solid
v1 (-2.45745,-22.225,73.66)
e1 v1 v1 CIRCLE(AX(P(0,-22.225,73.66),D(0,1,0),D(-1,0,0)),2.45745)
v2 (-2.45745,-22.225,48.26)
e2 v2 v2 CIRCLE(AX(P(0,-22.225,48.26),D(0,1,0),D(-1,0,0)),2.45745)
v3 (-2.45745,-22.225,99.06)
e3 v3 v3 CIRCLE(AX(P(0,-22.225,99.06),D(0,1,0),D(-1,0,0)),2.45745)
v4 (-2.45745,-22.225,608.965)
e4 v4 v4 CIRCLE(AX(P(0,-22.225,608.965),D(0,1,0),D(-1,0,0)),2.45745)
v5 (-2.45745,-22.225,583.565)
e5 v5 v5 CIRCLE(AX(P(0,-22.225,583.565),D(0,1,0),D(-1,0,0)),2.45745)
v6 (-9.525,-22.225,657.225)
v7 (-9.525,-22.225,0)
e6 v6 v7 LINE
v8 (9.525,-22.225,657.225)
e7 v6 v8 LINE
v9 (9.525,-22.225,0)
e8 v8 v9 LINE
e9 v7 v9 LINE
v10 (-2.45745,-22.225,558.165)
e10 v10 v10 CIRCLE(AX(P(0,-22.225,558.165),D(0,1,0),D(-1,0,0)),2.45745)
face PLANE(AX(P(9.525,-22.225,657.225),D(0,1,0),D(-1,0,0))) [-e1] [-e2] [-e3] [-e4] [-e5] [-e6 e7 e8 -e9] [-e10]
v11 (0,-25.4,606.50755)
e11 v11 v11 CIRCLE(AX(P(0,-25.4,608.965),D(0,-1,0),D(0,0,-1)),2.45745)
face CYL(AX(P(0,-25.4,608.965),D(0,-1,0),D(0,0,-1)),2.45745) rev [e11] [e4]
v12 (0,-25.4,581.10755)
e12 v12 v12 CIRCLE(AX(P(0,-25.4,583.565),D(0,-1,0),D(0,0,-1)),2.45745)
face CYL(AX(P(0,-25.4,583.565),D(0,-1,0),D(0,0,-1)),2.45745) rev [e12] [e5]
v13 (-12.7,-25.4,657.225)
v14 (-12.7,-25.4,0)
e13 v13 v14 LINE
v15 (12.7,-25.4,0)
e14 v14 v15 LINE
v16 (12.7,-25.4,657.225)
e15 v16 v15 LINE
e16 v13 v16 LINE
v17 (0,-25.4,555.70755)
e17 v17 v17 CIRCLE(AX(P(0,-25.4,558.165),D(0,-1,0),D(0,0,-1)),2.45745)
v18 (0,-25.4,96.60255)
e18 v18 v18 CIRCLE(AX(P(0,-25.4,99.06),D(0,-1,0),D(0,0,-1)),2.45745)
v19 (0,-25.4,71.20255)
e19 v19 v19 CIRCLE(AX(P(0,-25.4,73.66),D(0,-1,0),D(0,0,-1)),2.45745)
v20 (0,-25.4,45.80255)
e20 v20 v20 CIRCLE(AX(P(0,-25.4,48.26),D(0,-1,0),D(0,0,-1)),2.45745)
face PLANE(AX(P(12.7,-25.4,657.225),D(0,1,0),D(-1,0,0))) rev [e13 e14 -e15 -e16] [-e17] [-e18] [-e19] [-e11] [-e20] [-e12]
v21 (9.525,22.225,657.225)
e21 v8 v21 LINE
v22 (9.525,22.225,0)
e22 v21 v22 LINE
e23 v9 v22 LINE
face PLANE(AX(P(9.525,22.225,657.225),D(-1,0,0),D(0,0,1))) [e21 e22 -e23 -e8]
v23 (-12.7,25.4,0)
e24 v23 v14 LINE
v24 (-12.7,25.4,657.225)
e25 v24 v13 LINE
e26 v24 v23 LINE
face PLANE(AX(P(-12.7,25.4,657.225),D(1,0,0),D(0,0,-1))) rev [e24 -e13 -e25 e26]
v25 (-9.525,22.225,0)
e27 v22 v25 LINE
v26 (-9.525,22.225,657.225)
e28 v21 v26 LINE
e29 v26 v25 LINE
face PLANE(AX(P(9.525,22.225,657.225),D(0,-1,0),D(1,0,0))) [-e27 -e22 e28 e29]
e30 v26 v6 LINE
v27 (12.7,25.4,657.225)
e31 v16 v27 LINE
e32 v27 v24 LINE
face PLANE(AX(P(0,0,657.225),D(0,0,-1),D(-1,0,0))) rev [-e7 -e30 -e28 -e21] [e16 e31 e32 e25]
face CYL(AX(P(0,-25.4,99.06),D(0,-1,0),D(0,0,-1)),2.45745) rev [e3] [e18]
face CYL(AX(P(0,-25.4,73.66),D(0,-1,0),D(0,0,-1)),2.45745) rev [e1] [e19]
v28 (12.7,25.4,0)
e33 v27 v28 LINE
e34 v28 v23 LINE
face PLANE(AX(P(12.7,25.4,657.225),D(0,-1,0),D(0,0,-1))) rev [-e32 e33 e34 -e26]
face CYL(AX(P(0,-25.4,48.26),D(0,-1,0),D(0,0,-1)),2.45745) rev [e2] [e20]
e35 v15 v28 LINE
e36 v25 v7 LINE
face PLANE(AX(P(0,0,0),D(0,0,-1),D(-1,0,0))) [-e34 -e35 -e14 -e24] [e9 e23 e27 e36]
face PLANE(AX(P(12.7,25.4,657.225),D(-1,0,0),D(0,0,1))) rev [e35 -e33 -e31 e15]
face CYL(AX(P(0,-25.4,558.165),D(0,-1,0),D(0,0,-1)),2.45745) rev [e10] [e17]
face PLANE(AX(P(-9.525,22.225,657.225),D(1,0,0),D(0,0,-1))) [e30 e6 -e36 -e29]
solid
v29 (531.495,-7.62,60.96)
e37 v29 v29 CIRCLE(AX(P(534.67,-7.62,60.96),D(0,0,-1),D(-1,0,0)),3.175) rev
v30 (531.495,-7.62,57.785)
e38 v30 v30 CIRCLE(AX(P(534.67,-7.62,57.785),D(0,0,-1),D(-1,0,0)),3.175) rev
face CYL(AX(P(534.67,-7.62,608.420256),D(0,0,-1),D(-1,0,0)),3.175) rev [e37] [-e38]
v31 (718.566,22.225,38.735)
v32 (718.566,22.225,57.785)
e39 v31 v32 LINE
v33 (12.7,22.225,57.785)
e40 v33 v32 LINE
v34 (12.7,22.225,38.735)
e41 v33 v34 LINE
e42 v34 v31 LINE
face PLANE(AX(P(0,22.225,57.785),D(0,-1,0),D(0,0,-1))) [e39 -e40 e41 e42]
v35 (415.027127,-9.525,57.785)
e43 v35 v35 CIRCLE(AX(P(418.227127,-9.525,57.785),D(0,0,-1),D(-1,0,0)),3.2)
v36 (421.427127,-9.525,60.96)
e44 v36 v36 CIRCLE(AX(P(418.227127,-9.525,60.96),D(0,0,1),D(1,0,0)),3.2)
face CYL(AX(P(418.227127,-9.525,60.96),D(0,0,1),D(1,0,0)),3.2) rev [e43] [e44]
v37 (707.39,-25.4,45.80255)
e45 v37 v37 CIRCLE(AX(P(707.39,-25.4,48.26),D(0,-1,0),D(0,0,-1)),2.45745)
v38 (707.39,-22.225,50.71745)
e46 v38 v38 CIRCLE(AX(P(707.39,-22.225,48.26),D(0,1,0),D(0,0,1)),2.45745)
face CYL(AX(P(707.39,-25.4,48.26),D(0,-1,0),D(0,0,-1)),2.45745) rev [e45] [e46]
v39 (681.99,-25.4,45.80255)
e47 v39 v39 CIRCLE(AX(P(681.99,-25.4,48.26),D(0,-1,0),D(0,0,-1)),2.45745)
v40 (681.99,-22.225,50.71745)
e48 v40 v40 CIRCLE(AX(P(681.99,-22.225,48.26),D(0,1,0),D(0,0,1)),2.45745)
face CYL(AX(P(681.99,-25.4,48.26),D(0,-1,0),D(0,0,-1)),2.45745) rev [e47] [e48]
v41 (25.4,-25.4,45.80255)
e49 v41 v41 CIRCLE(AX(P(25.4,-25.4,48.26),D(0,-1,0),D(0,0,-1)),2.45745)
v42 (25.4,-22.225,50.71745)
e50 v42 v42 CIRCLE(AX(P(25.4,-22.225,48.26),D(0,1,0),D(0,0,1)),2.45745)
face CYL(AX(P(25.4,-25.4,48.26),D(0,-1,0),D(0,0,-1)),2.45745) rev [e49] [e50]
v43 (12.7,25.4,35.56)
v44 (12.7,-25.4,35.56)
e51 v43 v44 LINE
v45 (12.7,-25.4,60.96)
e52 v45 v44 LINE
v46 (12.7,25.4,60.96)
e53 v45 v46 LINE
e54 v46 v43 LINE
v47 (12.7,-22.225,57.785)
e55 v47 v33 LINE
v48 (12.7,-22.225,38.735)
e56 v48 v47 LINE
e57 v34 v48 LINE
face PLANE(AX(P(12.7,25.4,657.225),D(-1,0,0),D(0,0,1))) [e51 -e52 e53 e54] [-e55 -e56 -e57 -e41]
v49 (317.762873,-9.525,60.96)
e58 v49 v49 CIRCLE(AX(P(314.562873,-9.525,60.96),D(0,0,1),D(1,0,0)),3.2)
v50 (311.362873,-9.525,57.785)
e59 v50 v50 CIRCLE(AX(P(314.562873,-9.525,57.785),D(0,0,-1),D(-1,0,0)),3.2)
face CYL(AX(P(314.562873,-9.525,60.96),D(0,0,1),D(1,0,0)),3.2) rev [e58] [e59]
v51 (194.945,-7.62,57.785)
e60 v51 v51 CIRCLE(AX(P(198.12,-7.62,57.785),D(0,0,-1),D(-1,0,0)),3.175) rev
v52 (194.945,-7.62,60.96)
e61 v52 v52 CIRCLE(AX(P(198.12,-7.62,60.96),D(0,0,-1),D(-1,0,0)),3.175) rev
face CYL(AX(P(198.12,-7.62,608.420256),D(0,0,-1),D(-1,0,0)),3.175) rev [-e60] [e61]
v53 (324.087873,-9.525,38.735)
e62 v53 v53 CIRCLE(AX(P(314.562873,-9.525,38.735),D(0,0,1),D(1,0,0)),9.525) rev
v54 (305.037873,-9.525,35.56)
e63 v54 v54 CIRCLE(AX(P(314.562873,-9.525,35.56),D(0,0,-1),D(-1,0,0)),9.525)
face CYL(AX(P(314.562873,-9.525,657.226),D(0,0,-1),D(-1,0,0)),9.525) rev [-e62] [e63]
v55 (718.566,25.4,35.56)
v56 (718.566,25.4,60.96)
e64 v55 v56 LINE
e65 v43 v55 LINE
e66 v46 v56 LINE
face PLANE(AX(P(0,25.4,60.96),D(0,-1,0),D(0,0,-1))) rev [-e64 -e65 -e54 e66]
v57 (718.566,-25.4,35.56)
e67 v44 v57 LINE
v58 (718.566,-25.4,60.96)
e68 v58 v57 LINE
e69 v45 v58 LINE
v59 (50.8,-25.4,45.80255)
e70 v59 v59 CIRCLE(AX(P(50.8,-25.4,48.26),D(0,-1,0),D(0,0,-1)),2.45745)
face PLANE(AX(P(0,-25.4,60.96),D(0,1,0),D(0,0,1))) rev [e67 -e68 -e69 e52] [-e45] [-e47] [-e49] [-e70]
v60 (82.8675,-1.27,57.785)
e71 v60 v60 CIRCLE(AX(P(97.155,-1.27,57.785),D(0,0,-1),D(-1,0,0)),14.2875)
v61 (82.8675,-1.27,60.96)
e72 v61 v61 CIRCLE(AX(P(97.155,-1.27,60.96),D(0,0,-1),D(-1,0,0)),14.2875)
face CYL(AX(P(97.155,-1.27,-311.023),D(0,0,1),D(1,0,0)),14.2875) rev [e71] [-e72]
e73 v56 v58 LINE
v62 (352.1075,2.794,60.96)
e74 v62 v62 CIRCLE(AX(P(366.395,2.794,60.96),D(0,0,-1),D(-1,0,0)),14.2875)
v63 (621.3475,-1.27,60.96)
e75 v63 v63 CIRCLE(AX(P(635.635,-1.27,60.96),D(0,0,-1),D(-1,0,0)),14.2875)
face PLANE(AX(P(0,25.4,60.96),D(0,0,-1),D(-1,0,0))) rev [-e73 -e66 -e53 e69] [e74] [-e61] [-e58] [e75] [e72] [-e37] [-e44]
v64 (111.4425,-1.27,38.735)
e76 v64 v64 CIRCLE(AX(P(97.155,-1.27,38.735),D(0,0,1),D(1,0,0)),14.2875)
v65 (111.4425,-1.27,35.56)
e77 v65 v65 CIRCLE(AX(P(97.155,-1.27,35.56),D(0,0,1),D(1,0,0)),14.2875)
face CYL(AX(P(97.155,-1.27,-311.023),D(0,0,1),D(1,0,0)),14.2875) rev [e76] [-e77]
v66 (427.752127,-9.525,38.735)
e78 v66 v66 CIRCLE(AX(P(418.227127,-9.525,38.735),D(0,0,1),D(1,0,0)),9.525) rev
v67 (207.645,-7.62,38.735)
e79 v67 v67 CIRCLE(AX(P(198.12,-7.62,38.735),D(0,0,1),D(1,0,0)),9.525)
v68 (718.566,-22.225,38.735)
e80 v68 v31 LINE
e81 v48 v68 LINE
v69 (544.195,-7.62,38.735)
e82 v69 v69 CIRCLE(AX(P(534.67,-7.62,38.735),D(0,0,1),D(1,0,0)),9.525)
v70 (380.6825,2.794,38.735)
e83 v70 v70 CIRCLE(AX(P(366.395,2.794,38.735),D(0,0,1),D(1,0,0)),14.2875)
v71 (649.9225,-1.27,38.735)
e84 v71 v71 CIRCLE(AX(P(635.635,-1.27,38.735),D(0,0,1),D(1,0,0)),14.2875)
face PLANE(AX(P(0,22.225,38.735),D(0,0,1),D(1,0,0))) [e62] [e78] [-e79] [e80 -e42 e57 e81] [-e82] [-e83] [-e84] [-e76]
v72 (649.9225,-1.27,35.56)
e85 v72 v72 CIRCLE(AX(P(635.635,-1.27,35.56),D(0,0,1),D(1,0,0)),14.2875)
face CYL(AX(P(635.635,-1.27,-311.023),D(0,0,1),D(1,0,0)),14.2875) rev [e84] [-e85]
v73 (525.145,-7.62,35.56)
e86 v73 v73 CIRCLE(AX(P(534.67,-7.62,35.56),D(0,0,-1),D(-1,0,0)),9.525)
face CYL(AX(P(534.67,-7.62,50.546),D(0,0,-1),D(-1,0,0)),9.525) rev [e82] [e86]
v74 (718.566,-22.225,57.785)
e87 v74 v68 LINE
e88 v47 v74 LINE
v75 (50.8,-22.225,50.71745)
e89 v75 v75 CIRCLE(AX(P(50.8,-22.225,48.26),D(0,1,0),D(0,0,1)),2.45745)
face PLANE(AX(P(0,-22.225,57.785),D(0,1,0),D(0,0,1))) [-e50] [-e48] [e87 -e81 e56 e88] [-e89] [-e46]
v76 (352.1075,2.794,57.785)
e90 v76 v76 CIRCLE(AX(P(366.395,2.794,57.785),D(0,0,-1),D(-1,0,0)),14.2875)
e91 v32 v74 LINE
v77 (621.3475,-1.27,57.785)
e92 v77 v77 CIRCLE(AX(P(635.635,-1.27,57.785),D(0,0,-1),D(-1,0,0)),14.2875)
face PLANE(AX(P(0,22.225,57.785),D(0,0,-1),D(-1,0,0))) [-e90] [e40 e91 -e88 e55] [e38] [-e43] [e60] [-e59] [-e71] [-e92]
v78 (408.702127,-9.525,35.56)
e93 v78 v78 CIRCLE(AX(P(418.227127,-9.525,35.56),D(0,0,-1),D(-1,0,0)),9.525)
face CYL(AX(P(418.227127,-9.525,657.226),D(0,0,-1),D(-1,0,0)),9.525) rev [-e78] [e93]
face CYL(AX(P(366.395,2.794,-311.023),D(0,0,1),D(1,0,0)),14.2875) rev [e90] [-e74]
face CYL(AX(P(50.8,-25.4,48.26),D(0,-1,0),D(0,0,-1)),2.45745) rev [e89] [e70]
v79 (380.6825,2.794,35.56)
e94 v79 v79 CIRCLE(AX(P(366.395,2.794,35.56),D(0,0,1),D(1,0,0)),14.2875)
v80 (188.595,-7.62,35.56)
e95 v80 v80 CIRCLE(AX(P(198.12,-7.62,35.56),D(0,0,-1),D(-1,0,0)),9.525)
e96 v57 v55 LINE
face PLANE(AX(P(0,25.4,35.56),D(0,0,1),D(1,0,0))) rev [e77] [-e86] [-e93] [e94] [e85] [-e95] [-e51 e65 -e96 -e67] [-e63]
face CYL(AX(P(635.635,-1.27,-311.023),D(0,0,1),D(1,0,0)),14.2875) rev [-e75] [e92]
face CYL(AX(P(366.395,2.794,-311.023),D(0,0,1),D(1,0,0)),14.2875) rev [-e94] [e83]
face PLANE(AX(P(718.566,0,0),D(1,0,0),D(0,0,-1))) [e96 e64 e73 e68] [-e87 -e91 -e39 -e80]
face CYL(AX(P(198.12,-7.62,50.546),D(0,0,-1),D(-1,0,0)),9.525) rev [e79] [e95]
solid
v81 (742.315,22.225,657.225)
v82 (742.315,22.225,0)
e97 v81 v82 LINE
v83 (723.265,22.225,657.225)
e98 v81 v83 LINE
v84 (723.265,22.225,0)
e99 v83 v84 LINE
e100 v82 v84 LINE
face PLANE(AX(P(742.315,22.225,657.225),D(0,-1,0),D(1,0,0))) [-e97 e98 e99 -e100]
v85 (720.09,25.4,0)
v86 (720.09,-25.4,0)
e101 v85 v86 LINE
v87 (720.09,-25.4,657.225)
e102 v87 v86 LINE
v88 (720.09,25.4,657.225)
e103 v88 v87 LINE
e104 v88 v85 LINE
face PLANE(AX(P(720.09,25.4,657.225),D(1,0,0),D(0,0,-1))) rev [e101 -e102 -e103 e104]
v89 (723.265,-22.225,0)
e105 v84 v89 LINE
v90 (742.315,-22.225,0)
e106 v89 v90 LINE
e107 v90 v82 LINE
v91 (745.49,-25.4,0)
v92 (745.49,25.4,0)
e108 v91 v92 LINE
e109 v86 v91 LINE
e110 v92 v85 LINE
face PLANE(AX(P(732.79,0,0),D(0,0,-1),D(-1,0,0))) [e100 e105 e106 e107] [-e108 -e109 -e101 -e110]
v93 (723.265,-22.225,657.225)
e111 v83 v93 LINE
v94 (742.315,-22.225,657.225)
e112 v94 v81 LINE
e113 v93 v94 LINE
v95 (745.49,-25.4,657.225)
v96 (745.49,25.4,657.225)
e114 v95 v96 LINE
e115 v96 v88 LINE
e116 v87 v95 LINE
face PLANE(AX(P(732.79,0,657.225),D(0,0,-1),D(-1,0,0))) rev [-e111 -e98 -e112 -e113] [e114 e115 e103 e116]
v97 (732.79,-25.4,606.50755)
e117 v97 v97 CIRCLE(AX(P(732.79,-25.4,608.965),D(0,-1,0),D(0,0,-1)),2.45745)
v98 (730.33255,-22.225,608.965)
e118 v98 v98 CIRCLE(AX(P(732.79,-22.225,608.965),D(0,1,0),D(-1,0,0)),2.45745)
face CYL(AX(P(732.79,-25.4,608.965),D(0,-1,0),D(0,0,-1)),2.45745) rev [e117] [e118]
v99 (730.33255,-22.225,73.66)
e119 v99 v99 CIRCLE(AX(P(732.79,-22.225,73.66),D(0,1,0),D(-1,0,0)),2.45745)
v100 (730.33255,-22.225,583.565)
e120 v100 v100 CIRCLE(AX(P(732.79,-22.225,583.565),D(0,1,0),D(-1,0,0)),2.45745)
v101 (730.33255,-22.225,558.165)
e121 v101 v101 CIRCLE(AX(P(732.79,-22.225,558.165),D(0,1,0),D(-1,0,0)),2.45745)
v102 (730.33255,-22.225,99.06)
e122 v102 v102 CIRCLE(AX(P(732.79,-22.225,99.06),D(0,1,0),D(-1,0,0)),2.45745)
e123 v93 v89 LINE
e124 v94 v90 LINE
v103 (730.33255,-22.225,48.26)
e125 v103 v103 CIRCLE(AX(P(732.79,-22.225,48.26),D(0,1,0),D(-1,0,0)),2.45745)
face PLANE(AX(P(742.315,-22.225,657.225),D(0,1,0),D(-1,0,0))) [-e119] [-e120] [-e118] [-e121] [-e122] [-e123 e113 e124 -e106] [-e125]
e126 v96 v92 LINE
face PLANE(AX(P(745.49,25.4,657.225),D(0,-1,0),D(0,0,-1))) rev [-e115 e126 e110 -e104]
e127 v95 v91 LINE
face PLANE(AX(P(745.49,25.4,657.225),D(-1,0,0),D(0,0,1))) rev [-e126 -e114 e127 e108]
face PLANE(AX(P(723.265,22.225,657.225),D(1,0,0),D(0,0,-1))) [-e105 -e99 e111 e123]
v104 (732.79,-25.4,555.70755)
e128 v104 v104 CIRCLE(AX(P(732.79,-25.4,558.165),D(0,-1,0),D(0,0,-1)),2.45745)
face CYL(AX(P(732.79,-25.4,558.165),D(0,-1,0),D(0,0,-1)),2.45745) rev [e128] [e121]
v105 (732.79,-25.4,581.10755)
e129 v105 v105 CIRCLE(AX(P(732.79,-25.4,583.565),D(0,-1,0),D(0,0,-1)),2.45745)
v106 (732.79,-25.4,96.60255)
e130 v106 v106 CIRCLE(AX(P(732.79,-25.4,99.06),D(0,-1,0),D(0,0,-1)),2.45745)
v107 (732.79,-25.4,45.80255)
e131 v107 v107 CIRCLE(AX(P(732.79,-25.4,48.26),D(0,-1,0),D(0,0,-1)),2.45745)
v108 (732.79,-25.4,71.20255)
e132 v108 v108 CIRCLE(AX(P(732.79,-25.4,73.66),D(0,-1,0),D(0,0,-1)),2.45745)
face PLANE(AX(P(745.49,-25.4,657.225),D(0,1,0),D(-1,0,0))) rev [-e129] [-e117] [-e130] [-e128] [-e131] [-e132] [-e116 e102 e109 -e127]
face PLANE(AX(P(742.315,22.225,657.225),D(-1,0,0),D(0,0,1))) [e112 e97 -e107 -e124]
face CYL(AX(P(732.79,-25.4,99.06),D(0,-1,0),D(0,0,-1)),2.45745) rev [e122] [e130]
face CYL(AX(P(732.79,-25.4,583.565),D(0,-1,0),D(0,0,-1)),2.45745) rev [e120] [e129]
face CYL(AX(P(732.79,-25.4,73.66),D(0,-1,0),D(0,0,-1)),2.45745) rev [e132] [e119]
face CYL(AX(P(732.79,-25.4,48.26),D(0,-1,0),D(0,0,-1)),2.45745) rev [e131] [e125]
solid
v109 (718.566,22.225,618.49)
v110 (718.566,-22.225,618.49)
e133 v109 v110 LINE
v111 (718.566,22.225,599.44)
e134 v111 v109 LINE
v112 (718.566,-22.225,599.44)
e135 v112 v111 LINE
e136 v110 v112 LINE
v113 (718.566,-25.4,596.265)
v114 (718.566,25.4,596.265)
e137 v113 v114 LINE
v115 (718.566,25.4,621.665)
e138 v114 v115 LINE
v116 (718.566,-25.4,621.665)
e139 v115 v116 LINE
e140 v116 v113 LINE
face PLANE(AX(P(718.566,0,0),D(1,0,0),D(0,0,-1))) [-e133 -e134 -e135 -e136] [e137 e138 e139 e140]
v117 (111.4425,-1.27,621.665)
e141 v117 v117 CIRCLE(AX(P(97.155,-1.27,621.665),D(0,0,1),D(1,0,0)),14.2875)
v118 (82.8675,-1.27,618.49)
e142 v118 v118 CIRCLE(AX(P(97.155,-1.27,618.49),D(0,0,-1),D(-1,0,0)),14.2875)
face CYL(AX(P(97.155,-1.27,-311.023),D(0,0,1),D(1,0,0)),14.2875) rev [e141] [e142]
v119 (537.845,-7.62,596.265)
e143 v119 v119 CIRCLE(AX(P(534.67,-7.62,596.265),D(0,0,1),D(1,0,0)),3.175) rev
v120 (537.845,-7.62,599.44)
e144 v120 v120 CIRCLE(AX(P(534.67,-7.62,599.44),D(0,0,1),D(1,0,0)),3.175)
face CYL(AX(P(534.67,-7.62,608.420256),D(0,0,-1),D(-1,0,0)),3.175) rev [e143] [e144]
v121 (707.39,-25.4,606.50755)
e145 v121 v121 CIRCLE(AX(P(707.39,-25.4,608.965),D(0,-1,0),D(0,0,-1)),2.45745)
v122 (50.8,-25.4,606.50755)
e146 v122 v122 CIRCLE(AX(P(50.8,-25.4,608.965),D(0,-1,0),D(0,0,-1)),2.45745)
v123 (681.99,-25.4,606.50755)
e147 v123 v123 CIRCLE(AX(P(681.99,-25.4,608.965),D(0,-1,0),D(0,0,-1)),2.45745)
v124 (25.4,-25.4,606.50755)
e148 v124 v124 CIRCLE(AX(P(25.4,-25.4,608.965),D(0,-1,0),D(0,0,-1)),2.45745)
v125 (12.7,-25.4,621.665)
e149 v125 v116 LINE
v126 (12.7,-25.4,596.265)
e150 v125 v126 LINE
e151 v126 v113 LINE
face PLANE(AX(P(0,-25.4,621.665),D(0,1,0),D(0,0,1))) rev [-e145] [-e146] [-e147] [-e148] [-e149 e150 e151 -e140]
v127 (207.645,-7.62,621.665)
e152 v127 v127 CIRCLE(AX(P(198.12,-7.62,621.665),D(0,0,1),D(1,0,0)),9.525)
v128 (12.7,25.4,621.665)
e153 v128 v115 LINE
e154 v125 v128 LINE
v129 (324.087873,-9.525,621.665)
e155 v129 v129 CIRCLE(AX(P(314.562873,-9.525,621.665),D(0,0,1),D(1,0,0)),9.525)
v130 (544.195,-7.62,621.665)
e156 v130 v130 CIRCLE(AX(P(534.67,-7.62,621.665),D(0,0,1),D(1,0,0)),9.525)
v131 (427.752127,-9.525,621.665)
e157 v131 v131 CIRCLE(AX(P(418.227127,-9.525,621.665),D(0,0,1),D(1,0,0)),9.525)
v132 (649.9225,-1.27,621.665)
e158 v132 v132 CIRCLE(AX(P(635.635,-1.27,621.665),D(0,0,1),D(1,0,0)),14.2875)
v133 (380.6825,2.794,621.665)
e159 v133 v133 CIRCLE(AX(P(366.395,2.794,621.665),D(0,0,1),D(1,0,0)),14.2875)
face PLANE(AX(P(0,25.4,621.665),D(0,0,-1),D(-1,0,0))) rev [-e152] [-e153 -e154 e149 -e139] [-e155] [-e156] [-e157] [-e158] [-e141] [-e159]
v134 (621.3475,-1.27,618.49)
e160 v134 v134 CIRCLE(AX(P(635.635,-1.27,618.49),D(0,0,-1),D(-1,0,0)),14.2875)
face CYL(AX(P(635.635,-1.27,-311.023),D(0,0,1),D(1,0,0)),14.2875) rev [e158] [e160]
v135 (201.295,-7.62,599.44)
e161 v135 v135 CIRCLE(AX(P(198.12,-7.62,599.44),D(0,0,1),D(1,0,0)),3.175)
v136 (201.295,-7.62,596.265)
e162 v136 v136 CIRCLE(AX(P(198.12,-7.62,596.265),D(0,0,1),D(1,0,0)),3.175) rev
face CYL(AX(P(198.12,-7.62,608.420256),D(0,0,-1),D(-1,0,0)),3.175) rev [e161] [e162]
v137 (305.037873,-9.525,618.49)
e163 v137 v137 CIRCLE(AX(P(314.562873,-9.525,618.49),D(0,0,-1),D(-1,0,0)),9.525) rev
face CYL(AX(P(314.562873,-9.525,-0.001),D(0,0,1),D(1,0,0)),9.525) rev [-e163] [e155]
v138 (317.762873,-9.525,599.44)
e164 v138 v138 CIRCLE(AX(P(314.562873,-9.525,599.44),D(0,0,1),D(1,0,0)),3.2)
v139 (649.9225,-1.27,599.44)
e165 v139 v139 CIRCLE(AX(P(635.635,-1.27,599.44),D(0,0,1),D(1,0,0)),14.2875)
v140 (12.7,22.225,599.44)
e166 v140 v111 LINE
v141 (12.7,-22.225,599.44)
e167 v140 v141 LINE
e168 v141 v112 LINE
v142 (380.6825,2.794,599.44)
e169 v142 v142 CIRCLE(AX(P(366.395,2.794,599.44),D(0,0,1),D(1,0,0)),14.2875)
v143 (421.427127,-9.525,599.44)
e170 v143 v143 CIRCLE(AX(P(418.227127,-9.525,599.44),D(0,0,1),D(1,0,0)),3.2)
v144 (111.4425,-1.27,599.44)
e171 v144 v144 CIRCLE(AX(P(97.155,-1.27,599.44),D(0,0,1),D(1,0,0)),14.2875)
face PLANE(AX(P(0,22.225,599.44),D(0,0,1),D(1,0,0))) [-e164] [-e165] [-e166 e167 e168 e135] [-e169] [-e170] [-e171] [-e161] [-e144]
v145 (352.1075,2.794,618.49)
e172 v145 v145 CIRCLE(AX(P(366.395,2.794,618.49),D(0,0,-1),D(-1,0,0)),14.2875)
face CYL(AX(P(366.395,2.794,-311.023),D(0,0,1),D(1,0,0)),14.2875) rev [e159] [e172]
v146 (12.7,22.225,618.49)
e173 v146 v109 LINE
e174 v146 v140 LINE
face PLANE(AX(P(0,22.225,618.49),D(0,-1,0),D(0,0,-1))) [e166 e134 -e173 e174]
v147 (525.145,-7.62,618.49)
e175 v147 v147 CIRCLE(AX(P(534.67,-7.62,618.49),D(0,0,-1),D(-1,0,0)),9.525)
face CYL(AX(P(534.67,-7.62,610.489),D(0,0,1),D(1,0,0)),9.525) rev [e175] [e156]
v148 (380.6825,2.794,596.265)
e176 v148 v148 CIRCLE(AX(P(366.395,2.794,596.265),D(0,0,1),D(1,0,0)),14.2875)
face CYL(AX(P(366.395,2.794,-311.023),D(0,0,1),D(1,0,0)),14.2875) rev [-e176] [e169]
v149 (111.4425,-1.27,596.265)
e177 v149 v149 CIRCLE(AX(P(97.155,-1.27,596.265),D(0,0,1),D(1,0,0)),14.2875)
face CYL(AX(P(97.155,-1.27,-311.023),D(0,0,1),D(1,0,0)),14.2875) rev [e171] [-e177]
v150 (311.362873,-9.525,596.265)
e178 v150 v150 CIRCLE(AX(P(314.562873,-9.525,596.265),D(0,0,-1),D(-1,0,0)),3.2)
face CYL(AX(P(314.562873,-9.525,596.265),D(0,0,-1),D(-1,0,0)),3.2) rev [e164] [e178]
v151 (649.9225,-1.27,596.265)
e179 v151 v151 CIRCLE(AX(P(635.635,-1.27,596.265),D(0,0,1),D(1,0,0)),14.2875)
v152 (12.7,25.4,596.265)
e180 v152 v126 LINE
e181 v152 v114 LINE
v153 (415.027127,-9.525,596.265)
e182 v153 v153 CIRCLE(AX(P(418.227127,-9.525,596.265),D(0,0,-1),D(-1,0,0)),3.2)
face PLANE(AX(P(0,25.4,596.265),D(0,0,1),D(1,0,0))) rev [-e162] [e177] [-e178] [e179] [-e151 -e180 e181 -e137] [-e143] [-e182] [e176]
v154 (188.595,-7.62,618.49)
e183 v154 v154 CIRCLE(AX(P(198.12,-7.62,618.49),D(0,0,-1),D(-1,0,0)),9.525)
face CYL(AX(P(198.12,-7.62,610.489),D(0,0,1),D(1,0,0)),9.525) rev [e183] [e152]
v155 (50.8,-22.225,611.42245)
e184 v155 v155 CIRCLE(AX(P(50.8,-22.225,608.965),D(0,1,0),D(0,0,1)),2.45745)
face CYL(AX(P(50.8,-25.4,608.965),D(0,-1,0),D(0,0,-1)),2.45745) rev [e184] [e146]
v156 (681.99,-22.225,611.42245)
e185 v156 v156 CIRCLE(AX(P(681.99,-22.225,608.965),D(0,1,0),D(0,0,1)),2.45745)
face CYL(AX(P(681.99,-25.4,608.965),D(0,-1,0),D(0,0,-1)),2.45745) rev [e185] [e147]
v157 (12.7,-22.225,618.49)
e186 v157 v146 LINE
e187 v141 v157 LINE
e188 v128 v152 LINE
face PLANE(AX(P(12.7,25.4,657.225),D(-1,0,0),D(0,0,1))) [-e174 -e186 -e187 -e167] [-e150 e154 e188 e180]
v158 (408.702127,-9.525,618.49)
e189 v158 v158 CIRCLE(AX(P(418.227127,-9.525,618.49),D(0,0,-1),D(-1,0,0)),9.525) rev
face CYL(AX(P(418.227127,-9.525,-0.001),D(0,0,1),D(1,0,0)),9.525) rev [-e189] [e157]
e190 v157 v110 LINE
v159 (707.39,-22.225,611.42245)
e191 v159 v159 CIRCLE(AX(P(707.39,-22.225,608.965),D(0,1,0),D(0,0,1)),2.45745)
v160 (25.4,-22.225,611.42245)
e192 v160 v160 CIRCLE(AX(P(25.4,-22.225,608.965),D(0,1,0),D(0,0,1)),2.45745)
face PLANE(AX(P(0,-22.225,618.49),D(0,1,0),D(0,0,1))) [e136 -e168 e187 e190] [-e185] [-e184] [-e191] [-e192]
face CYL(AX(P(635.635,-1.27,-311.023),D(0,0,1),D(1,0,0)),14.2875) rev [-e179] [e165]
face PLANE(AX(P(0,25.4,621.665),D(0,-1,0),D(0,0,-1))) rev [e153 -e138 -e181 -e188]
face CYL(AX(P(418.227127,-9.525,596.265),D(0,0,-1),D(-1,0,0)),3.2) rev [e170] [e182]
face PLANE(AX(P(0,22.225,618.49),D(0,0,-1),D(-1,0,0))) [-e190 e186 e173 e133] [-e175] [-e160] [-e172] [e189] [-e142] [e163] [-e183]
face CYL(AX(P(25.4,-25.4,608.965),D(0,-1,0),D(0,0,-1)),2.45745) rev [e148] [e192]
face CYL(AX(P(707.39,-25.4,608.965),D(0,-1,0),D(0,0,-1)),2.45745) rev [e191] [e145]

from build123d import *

# Parameters (mm, degrees)
STRUCTURAL_START                       = -25.4
STRUCTURAL_MEMBER1_OUTLINE_W           = 707.39
STRUCTURAL_MEMBER1_OUTLINE_H           = 3.175
STRUCTURAL_MEMBER1_DEPTH               = 50.8
STRUCTURAL_MEMBER1_2_OUTLINE_W         = 707.39
STRUCTURAL_MEMBER1_2_OUTLINE_H         = 19.05
STRUCTURAL_MEMBER1_2_DEPTH             = 3.175
STRUCTURAL_START_2                     = 22.225
STRUCTURAL_MEMBER1_3_OUTLINE_W         = 707.39
STRUCTURAL_MEMBER1_3_OUTLINE_H         = 19.05
STRUCTURAL_MEMBER1_3_DEPTH             = 3.175
STRUCTURAL_MEMBER1_4_OUTLINE_W         = 707.39
STRUCTURAL_MEMBER1_4_OUTLINE_H         = 3.175
STRUCTURAL_MEMBER1_4_DEPTH             = 50.8
STRUCTURAL_MEMBER1_5_OUTLINE_W         = 707.39
STRUCTURAL_MEMBER1_5_OUTLINE_H         = 19.05
STRUCTURAL_MEMBER1_5_DEPTH             = 3.175
STRUCTURAL_MEMBER1_6_OUTLINE_W         = 707.39
STRUCTURAL_MEMBER1_6_OUTLINE_H         = 19.05
STRUCTURAL_MEMBER1_6_DEPTH             = 3.175
STRUCTURAL_START_3                     = -12.7
STRUCTURAL_MEMBER1_7_OUTLINE_W         = 50.8
STRUCTURAL_MEMBER1_7_OUTLINE_H         = 657.225
STRUCTURAL_MEMBER1_7_DEPTH             = 3.175
STRUCTURAL_START_4                     = 9.525
STRUCTURAL_MEMBER1_8_OUTLINE_W         = 50.8
STRUCTURAL_MEMBER1_8_OUTLINE_H         = 657.225
STRUCTURAL_MEMBER1_8_DEPTH             = 3.175
STRUCTURAL_START_5                     = -9.525
STRUCTURAL_MEMBER1_9_OUTLINE_W         = 3.175
STRUCTURAL_MEMBER1_9_OUTLINE_H         = 657.225
STRUCTURAL_MEMBER1_9_DEPTH             = 19.05
STRUCTURAL_START_6                     = 720.09
STRUCTURAL_MEMBER1_10_OUTLINE_W        = 50.8
STRUCTURAL_MEMBER1_10_OUTLINE_H        = 657.225
STRUCTURAL_MEMBER1_10_DEPTH            = 3.175
STRUCTURAL_START_7                     = 742.315
STRUCTURAL_MEMBER1_11_OUTLINE_W        = 50.8
STRUCTURAL_MEMBER1_11_OUTLINE_H        = 657.225
STRUCTURAL_MEMBER1_11_DEPTH            = 3.175
STRUCTURAL_START_8                     = 723.265
STRUCTURAL_MEMBER1_12_OUTLINE_W        = 3.175
STRUCTURAL_MEMBER1_12_OUTLINE_H        = 657.225
STRUCTURAL_MEMBER1_12_DEPTH            = 19.05
SKETCH5_R                              = 14.2875
CUT_EXTRUDE1_DEPTH                     = 932.688
CUT_EXTRUDE8_START                     = -3.175
SKETCH8_R                              = 3.175
CUT_EXTRUDE8_DEPTH                     = 541.655
SKETCH10_R                             = 9.525
CUT_EXTRUDE9_DEPTH                     = 11.176
SKETCH11_R                             = 9.525
CUT_EXTRUDE10_DEPTH                    = 14.986
SKETCH13_W                             = 3.2
SKETCH13_H                             = 3.176
M6_CLEARANCE_HOLE1_AT_2_COUNT          = 2
M6_CLEARANCE_HOLE1_AT_2_PITCH          = 103.664253865
SKETCH17_W                             = 3.2
SKETCH17_H                             = 3.176
M6_CLEARANCE_HOLE3_AT_2_COUNT          = 2
M6_CLEARANCE_HOLE3_AT_2_PITCH          = 103.664253865
SKETCH20_R                             = 9.525
CUT_EXTRUDE11_DEPTH                    = 3.175
SKETCH21_R                             = 9.525
CUT_EXTRUDE12_DEPTH                    = 3.175
SKETCH22_R                             = 9.525
CUT_EXTRUDE13_DEPTH                    = 3.175
SKETCH23_R                             = 9.525
CUT_EXTRUDE14_DEPTH                    = 3.175
F_10_START                             = -25.4
F_10_0_1935_DIAMETER_HOLE1_OUTLINE_R   = 2.45745
F_10_0_1935_DIAMETER_HOLE1_DEPTH       = 3.175
SKETCH26_W                             = 2.45745
SKETCH26_H                             = 3.176
F_10_0_1935_DIAMETER_HOLE2_AT_2_COUNT  = 2
F_10_0_1935_DIAMETER_HOLE2_AT_2_PITCH  = 25.4
F_10_0_1935_DIAMETER_HOLE2_AT_3_COUNT  = 2
F_10_0_1935_DIAMETER_HOLE2_AT_3_PITCH  = 50.8
F_10_0_1935_DIAMETER_HOLE2_AT_4_COUNT  = 2
F_10_0_1935_DIAMETER_HOLE2_AT_4_PITCH  = 56.796126628
F_10_0_1935_DIAMETER_HOLE2_AT_5_COUNT  = 2
F_10_0_1935_DIAMETER_HOLE2_AT_5_PITCH  = 71.842048969
F_10_0_1935_DIAMETER_HOLE2_AT_6_COUNT  = 2
F_10_0_1935_DIAMETER_HOLE2_AT_6_PITCH  = 683.879375402
F_10_0_1935_DIAMETER_HOLE2_AT_7_COUNT  = 2
F_10_0_1935_DIAMETER_HOLE2_AT_7_PITCH  = 709.211711762
F_10_0_1935_DIAMETER_HOLE2_AT_8_COUNT  = 2
F_10_0_1935_DIAMETER_HOLE2_AT_8_PITCH  = 733.230075829
F_10_0_1935_DIAMETER_HOLE2_AT_9_COUNT  = 2
F_10_0_1935_DIAMETER_HOLE2_AT_9_PITCH  = 734.548721393
F_10_0_1935_DIAMETER_HOLE2_AT_10_COUNT = 2
F_10_0_1935_DIAMETER_HOLE2_AT_10_PITCH = 732.79
F_10_0_1935_DIAMETER_HOLE2_AT_11_COUNT = 2
F_10_0_1935_DIAMETER_HOLE2_AT_11_PITCH = 851.535947054
F_10_0_1935_DIAMETER_HOLE2_AT_12_COUNT = 2
F_10_0_1935_DIAMETER_HOLE2_AT_12_PITCH = 872.011307911
F_10_0_1935_DIAMETER_HOLE2_AT_13_COUNT = 2
F_10_0_1935_DIAMETER_HOLE2_AT_13_PITCH = 892.739767864
F_10_0_1935_DIAMETER_HOLE2_AT_14_COUNT = 2
F_10_0_1935_DIAMETER_HOLE2_AT_14_PITCH = 878.479526867
F_10_0_1935_DIAMETER_HOLE2_AT_15_COUNT = 2
F_10_0_1935_DIAMETER_HOLE2_AT_15_PITCH = 864.730353998
SKETCH28_W                             = 25.4
SKETCH28_H                             = 50.8
CUT_EXTRUDE15_DEPTH                    = 1.524


# Read off the part's stored shape, not the designer's step: Structural Member1, #10 (0.1935) Diameter Hole1
with BuildPart() as part:
    # Structural Member1 outline → Structural Member1 (new body)
    with BuildSketch(Plane(origin=(0, 0, 0), x_dir=(1, 0, 0), z_dir=(0, 1, 0)).offset(STRUCTURAL_START)):
        with Locations((366.395, -59.3725)):
            Rectangle(STRUCTURAL_MEMBER1_OUTLINE_W, STRUCTURAL_MEMBER1_OUTLINE_H)
        with Locations((366.395, -37.1475)):
            Rectangle(STRUCTURAL_MEMBER1_OUTLINE_W, STRUCTURAL_MEMBER1_OUTLINE_H)
    extrude(amount=STRUCTURAL_MEMBER1_DEPTH)

    # Structural Member1 2 outline → Structural Member1 2 (add)
    with BuildSketch(Plane(origin=(0, 0, 0), x_dir=(1, 0, 0), z_dir=(0, 1, 0)).offset(STRUCTURAL_START)):
        with Locations((366.395, -48.26)):
            Rectangle(STRUCTURAL_MEMBER1_2_OUTLINE_W, STRUCTURAL_MEMBER1_2_OUTLINE_H)
    extrude(amount=STRUCTURAL_MEMBER1_2_DEPTH)

    # Structural Member1 3 outline → Structural Member1 3 (add)
    with BuildSketch(Plane(origin=(0, 0, 0), x_dir=(1, 0, 0), z_dir=(0, 1, 0)).offset(STRUCTURAL_START_2)):
        with Locations((366.395, -48.26)):
            Rectangle(STRUCTURAL_MEMBER1_3_OUTLINE_W, STRUCTURAL_MEMBER1_3_OUTLINE_H)
    extrude(amount=STRUCTURAL_MEMBER1_3_DEPTH)


with BuildPart() as body_2:
    # Structural Member1 4 outline → Structural Member1 4 (new body)
    with BuildSketch(Plane(origin=(0, 0, 0), x_dir=(1, 0, 0), z_dir=(0, 1, 0)).offset(STRUCTURAL_START)):
        with Locations((366.395, -620.0775)):
            Rectangle(STRUCTURAL_MEMBER1_4_OUTLINE_W, STRUCTURAL_MEMBER1_4_OUTLINE_H)
        with Locations((366.395, -597.8525)):
            Rectangle(STRUCTURAL_MEMBER1_4_OUTLINE_W, STRUCTURAL_MEMBER1_4_OUTLINE_H)
    extrude(amount=STRUCTURAL_MEMBER1_4_DEPTH)

    # Structural Member1 5 outline → Structural Member1 5 (add)
    with BuildSketch(Plane(origin=(0, 0, 0), x_dir=(1, 0, 0), z_dir=(0, 1, 0)).offset(STRUCTURAL_START)):
        with Locations((366.395, -608.965)):
            Rectangle(STRUCTURAL_MEMBER1_5_OUTLINE_W, STRUCTURAL_MEMBER1_5_OUTLINE_H)
    extrude(amount=STRUCTURAL_MEMBER1_5_DEPTH)

    # Structural Member1 6 outline → Structural Member1 6 (add)
    with BuildSketch(Plane(origin=(0, 0, 0), x_dir=(1, 0, 0), z_dir=(0, 1, 0)).offset(STRUCTURAL_START_2)):
        with Locations((366.395, -608.965)):
            Rectangle(STRUCTURAL_MEMBER1_6_OUTLINE_W, STRUCTURAL_MEMBER1_6_OUTLINE_H)
    extrude(amount=STRUCTURAL_MEMBER1_6_DEPTH)


with BuildPart() as body_3:
    # Structural Member1 7 outline → Structural Member1 7 (new body)
    with BuildSketch(Plane.YZ.offset(STRUCTURAL_START_3)):
        with Locations((0, 328.6125)):
            Rectangle(STRUCTURAL_MEMBER1_7_OUTLINE_W, STRUCTURAL_MEMBER1_7_OUTLINE_H)
    extrude(amount=STRUCTURAL_MEMBER1_7_DEPTH)

    # Structural Member1 8 outline → Structural Member1 8 (add)
    with BuildSketch(Plane.YZ.offset(STRUCTURAL_START_4)):
        with Locations((0, 328.6125)):
            Rectangle(STRUCTURAL_MEMBER1_8_OUTLINE_W, STRUCTURAL_MEMBER1_8_OUTLINE_H)
    extrude(amount=STRUCTURAL_MEMBER1_8_DEPTH)

    # Structural Member1 9 outline → Structural Member1 9 (add)
    with BuildSketch(Plane.YZ.offset(STRUCTURAL_START_5)):
        with Locations((-23.8125, 328.6125)):
            Rectangle(STRUCTURAL_MEMBER1_9_OUTLINE_W, STRUCTURAL_MEMBER1_9_OUTLINE_H)
        with Locations((23.8125, 328.6125)):
            Rectangle(STRUCTURAL_MEMBER1_9_OUTLINE_W, STRUCTURAL_MEMBER1_9_OUTLINE_H)
    extrude(amount=STRUCTURAL_MEMBER1_9_DEPTH)


with BuildPart() as body_4:
    # Structural Member1 10 outline → Structural Member1 10 (new body)
    with BuildSketch(Plane.YZ.offset(STRUCTURAL_START_6)):
        with Locations((0, 328.6125)):
            Rectangle(STRUCTURAL_MEMBER1_10_OUTLINE_W, STRUCTURAL_MEMBER1_10_OUTLINE_H)
    extrude(amount=STRUCTURAL_MEMBER1_10_DEPTH)

    # Structural Member1 11 outline → Structural Member1 11 (add)
    with BuildSketch(Plane.YZ.offset(STRUCTURAL_START_7)):
        with Locations((0, 328.6125)):
            Rectangle(STRUCTURAL_MEMBER1_11_OUTLINE_W, STRUCTURAL_MEMBER1_11_OUTLINE_H)
    extrude(amount=STRUCTURAL_MEMBER1_11_DEPTH)

    # Structural Member1 12 outline → Structural Member1 12 (add)
    with BuildSketch(Plane.YZ.offset(STRUCTURAL_START_8)):
        with Locations((-23.8125, 328.6125)):
            Rectangle(STRUCTURAL_MEMBER1_12_OUTLINE_W, STRUCTURAL_MEMBER1_12_OUTLINE_H)
        with Locations((23.8125, 328.6125)):
            Rectangle(STRUCTURAL_MEMBER1_12_OUTLINE_W, STRUCTURAL_MEMBER1_12_OUTLINE_H)
    extrude(amount=STRUCTURAL_MEMBER1_12_DEPTH)


with BuildPart() as cut_extrude1_tool:
    # Sketch5 → Cut-Extrude1 (new body)
    with BuildSketch(Plane.XY.offset(621.665)):
        with Locations(Location((366.395, 2.794, 0), (0, 0, 180))):
            Circle(SKETCH5_R)
        with Locations(Location((97.155, -1.27, 0), (0, 0, 180))):
            Circle(SKETCH5_R)
        with Locations(Location((635.635, -1.27, 0), (0, 0, 180))):
            Circle(SKETCH5_R)
    extrude(amount=-CUT_EXTRUDE1_DEPTH)


with BuildPart() as part_1:
    add(part.part)

    # Cut-Extrude1: cut by cut_extrude1_tool
    add(cut_extrude1_tool.part, mode=Mode.SUBTRACT)


with BuildPart() as body_2_1:
    add(body_2.part)

    # Cut-Extrude1: cut by cut_extrude1_tool
    add(cut_extrude1_tool.part, mode=Mode.SUBTRACT)


with BuildPart() as cut_extrude8_tool:
    # Sketch8 → Cut-Extrude8 (new body)
    with BuildSketch(Plane.XY.offset(60.96).offset(CUT_EXTRUDE8_START)):
        with Locations(Location((534.67, -7.62, 0), (0, 0, 180))):
            Circle(SKETCH8_R)
        with Locations(Location((198.12, -7.62, 0), (0, 0, 180))):
            Circle(SKETCH8_R)
    extrude(amount=CUT_EXTRUDE8_DEPTH)


with BuildPart() as part_2:
    add(part_1.part)

    # Cut-Extrude8: cut by cut_extrude8_tool
    add(cut_extrude8_tool.part, mode=Mode.SUBTRACT)

    # Sketch11 → Cut-Extrude10 (cut)
    with BuildSketch(Plane(origin=(0, 0, 35.56), x_dir=(-1, 0, 0), z_dir=(0, 0, -1))):
        with Locations((-198.12, -7.62)):
            Circle(SKETCH11_R)
        with Locations((-534.67, -7.62)):
            Circle(SKETCH11_R)
    extrude(amount=-CUT_EXTRUDE10_DEPTH, mode=Mode.SUBTRACT)

    # Sketch13 → M6 Clearance Hole1 (revolve, cut)
    with BuildSketch(Plane(origin=(314.562873067, -9.525, 60.96), x_dir=(0, -1, 0), z_dir=(1, 0, 0))):
        with Locations((1.6, 1.588)):
            Rectangle(SKETCH13_W, SKETCH13_H)
    m6_clearance_hole1 = revolve(axis=Axis((314.562873067, -9.525, 67.31), (0, 0, -1)), mode=Mode.SUBTRACT)

    # M6 Clearance Hole1 at 2: M6 Clearance Hole1 ×2
    with Locations(*[(i * M6_CLEARANCE_HOLE1_AT_2_PITCH, 0, 0) for i in range(1, M6_CLEARANCE_HOLE1_AT_2_COUNT)]):
        add(m6_clearance_hole1, mode=Mode.SUBTRACT)

    # Sketch22 → Cut-Extrude13 (cut)
    with BuildSketch(Plane(origin=(0, 0, 35.56), x_dir=(-1, 0, 0), z_dir=(0, 0, -1))):
        with Locations((-418.227126933, -9.525)):
            Circle(SKETCH22_R)
    extrude(amount=-CUT_EXTRUDE13_DEPTH, mode=Mode.SUBTRACT)

    # Sketch23 → Cut-Extrude14 (cut)
    with BuildSketch(Plane(origin=(0, 0, 35.56), x_dir=(-1, 0, 0), z_dir=(0, 0, -1))):
        with Locations((-314.562873067, -9.525)):
            Circle(SKETCH23_R)
    extrude(amount=-CUT_EXTRUDE14_DEPTH, mode=Mode.SUBTRACT)


with BuildPart() as body_2_2:
    add(body_2_1.part)

    # Cut-Extrude8: cut by cut_extrude8_tool
    add(cut_extrude8_tool.part, mode=Mode.SUBTRACT)

    # Sketch10 → Cut-Extrude9 (cut)
    with BuildSketch(Plane.XY.offset(621.665)):
        with Locations((534.67, -7.62)):
            Circle(SKETCH10_R)
        with Locations((198.12, -7.62)):
            Circle(SKETCH10_R)
    extrude(amount=-CUT_EXTRUDE9_DEPTH, mode=Mode.SUBTRACT)

    # Sketch17 → M6 Clearance Hole3 (revolve, cut)
    with BuildSketch(Plane(origin=(418.227126933, -9.525, 596.265), x_dir=(0, 1, 0), z_dir=(1, 0, 0))):
        with Locations((1.6, 1.588)):
            Rectangle(SKETCH17_W, SKETCH17_H)
    m6_clearance_hole3 = revolve(axis=Axis((418.227126933, -9.525, 589.915), (0, 0, 1)), mode=Mode.SUBTRACT)

    # M6 Clearance Hole3 at 2: M6 Clearance Hole3 ×2
    with Locations(*[(-i * M6_CLEARANCE_HOLE3_AT_2_PITCH, 0, 0) for i in range(1, M6_CLEARANCE_HOLE3_AT_2_COUNT)]):
        add(m6_clearance_hole3, mode=Mode.SUBTRACT)

    # Sketch20 → Cut-Extrude11 (cut)
    with BuildSketch(Plane.XY.offset(621.665)):
        with Locations((314.562873067, -9.525)):
            Circle(SKETCH20_R)
    extrude(amount=-CUT_EXTRUDE11_DEPTH, mode=Mode.SUBTRACT)

    # Sketch21 → Cut-Extrude12 (cut)
    with BuildSketch(Plane.XY.offset(621.665)):
        with Locations((418.227126933, -9.525)):
            Circle(SKETCH21_R)
    extrude(amount=-CUT_EXTRUDE12_DEPTH, mode=Mode.SUBTRACT)


with BuildPart() as f_10_0_1935_diameter_hole1_tool:
    # #10 (0.1935) Diameter Hole1 outline → #10 (0.1935) Diameter Hole1 (new body)
    with BuildSketch(Plane(origin=(0, 0, 0), x_dir=(1, 0, 0), z_dir=(0, 1, 0)).offset(F_10_START)):
        with Locations((681.99, -48.26)):
            Circle(F_10_0_1935_DIAMETER_HOLE1_OUTLINE_R)
        with Locations((707.39, -48.26)):
            Circle(F_10_0_1935_DIAMETER_HOLE1_OUTLINE_R)
        with Locations((732.79, -48.26)):
            Circle(F_10_0_1935_DIAMETER_HOLE1_OUTLINE_R)
        with Locations((732.79, -73.66)):
            Circle(F_10_0_1935_DIAMETER_HOLE1_OUTLINE_R)
        with Locations((732.79, -99.06)):
            Circle(F_10_0_1935_DIAMETER_HOLE1_OUTLINE_R)
    extrude(amount=F_10_0_1935_DIAMETER_HOLE1_DEPTH)


with BuildPart() as part_3:
    add(part_2.part)

    # #10 (0.1935) Diameter Hole1: cut by f_10_0_1935_diameter_hole1_tool
    add(f_10_0_1935_diameter_hole1_tool.part, mode=Mode.SUBTRACT)


with BuildPart() as body_4_1:
    add(body_4.part)

    # #10 (0.1935) Diameter Hole1: cut by f_10_0_1935_diameter_hole1_tool
    add(f_10_0_1935_diameter_hole1_tool.part, mode=Mode.SUBTRACT)

    # Sketch26 → #10 (0.1935) Diameter Hole2 (revolve, cut)
    with BuildSketch(Plane(origin=(732.79, -25.4, 558.165), x_dir=(0, 0, -1), z_dir=(1, 0, 0))):
        with Locations((1.228725, 1.588)):
            Rectangle(SKETCH26_W, SKETCH26_H)
    f_10_0_1935_diameter_hole2 = revolve(axis=Axis((732.79, -31.75, 558.165), (0, 1, 0)), mode=Mode.SUBTRACT)

    # #10 (0.1935) Diameter Hole2 at 2: #10 (0.1935) Diameter Hole2 ×2
    with Locations(*[(0, 0, i * F_10_0_1935_DIAMETER_HOLE2_AT_2_PITCH) for i in range(1, F_10_0_1935_DIAMETER_HOLE2_AT_2_COUNT)]):
        add(f_10_0_1935_diameter_hole2, mode=Mode.SUBTRACT)

    # #10 (0.1935) Diameter Hole2 at 3: #10 (0.1935) Diameter Hole2 ×2
    with Locations(*[(0, 0, i * F_10_0_1935_DIAMETER_HOLE2_AT_3_PITCH) for i in range(1, F_10_0_1935_DIAMETER_HOLE2_AT_3_COUNT)]):
        add(f_10_0_1935_diameter_hole2, mode=Mode.SUBTRACT)


with BuildPart() as body_2_3:
    add(body_2_2.part)

    # #10 (0.1935) Diameter Hole2 at 4: #10 (0.1935) Diameter Hole2 ×2
    with Locations(*[Vector(-0.447213595499958, 0, 0.894427190999916) * (i * F_10_0_1935_DIAMETER_HOLE2_AT_4_PITCH) for i in range(1, F_10_0_1935_DIAMETER_HOLE2_AT_4_COUNT)]):
        add(f_10_0_1935_diameter_hole2, mode=Mode.SUBTRACT)

    # #10 (0.1935) Diameter Hole2 at 5: #10 (0.1935) Diameter Hole2 ×2
    with Locations(*[Vector(-0.7071067811865476, 0, 0.7071067811865476) * (i * F_10_0_1935_DIAMETER_HOLE2_AT_5_PITCH) for i in range(1, F_10_0_1935_DIAMETER_HOLE2_AT_5_COUNT)]):
        add(f_10_0_1935_diameter_hole2, mode=Mode.SUBTRACT)

    # #10 (0.1935) Diameter Hole2 at 6: #10 (0.1935) Diameter Hole2 ×2
    with Locations(*[Vector(-0.9972372680478602, 0, 0.07428210562740108) * (i * F_10_0_1935_DIAMETER_HOLE2_AT_6_PITCH) for i in range(1, F_10_0_1935_DIAMETER_HOLE2_AT_6_COUNT)]):
        add(f_10_0_1935_diameter_hole2, mode=Mode.SUBTRACT)

    # #10 (0.1935) Diameter Hole2 at 7: #10 (0.1935) Diameter Hole2 ×2
    with Locations(*[Vector(-0.9974313569114609, 0, 0.07162882275845313) * (i * F_10_0_1935_DIAMETER_HOLE2_AT_7_PITCH) for i in range(1, F_10_0_1935_DIAMETER_HOLE2_AT_7_COUNT)]):
        add(f_10_0_1935_diameter_hole2, mode=Mode.SUBTRACT)


with BuildPart() as body_3_1:
    add(body_3.part)

    # #10 (0.1935) Diameter Hole2 at 8: #10 (0.1935) Diameter Hole2 ×2
    with Locations(*[Vector(-0.9993998120871332, 0, 0.034641241320177894) * (i * F_10_0_1935_DIAMETER_HOLE2_AT_8_PITCH) for i in range(1, F_10_0_1935_DIAMETER_HOLE2_AT_8_COUNT)]):
        add(f_10_0_1935_diameter_hole2, mode=Mode.SUBTRACT)

    # #10 (0.1935) Diameter Hole2 at 9: #10 (0.1935) Diameter Hole2 ×2
    with Locations(*[Vector(-0.9976057117224263, 0, 0.06915810826498615) * (i * F_10_0_1935_DIAMETER_HOLE2_AT_9_PITCH) for i in range(1, F_10_0_1935_DIAMETER_HOLE2_AT_9_COUNT)]):
        add(f_10_0_1935_diameter_hole2, mode=Mode.SUBTRACT)

    # #10 (0.1935) Diameter Hole2 at 10: #10 (0.1935) Diameter Hole2 ×2
    with Locations(*[(-i * F_10_0_1935_DIAMETER_HOLE2_AT_10_PITCH, 0, 0) for i in range(1, F_10_0_1935_DIAMETER_HOLE2_AT_10_COUNT)]):
        add(f_10_0_1935_diameter_hole2, mode=Mode.SUBTRACT)

    # #10 (0.1935) Diameter Hole2 at 13: #10 (0.1935) Diameter Hole2 ×2
    with Locations(*[Vector(-0.8208327066617611, 0, -0.5711686858313639) * (i * F_10_0_1935_DIAMETER_HOLE2_AT_13_PITCH) for i in range(1, F_10_0_1935_DIAMETER_HOLE2_AT_13_COUNT)]):
        add(f_10_0_1935_diameter_hole2, mode=Mode.SUBTRACT)

    # #10 (0.1935) Diameter Hole2 at 14: #10 (0.1935) Diameter Hole2 ×2
    with Locations(*[Vector(-0.8341571745139719, 0, -0.5515267973606243) * (i * F_10_0_1935_DIAMETER_HOLE2_AT_14_PITCH) for i in range(1, F_10_0_1935_DIAMETER_HOLE2_AT_14_COUNT)]):
        add(f_10_0_1935_diameter_hole2, mode=Mode.SUBTRACT)

    # #10 (0.1935) Diameter Hole2 at 15: #10 (0.1935) Diameter Hole2 ×2
    with Locations(*[Vector(-0.8474202352354836, 0, -0.5309227297012604) * (i * F_10_0_1935_DIAMETER_HOLE2_AT_15_PITCH) for i in range(1, F_10_0_1935_DIAMETER_HOLE2_AT_15_COUNT)]):
        add(f_10_0_1935_diameter_hole2, mode=Mode.SUBTRACT)


with BuildPart() as part_4:
    add(part_3.part)

    # #10 (0.1935) Diameter Hole2 at 11: #10 (0.1935) Diameter Hole2 ×2
    with Locations(*[Vector(-0.8008939638537933, 0, -0.5988061945759738) * (i * F_10_0_1935_DIAMETER_HOLE2_AT_11_PITCH) for i in range(1, F_10_0_1935_DIAMETER_HOLE2_AT_11_COUNT)]):
        add(f_10_0_1935_diameter_hole2, mode=Mode.SUBTRACT)

    # #10 (0.1935) Diameter Hole2 at 12: #10 (0.1935) Diameter Hole2 ×2
    with Locations(*[Vector(-0.8112165445359533, 0, -0.584745857506616) * (i * F_10_0_1935_DIAMETER_HOLE2_AT_12_PITCH) for i in range(1, F_10_0_1935_DIAMETER_HOLE2_AT_12_COUNT)]):
        add(f_10_0_1935_diameter_hole2, mode=Mode.SUBTRACT)


with BuildPart() as cut_extrude15_tool:
    # Sketch28 → Cut-Extrude15 (new body)
    with BuildSketch(Plane(origin=(720.09, 0, 0), x_dir=(0, 0, -1), z_dir=(1, 0, 0))):
        with Locations((-48.26, 0)):
            Rectangle(SKETCH28_W, SKETCH28_H)
        with Locations((-608.965, 0)):
            Rectangle(SKETCH28_W, SKETCH28_H)
    extrude(amount=-CUT_EXTRUDE15_DEPTH)


with BuildPart() as part_5:
    add(part_4.part)

    # Cut-Extrude15: cut by cut_extrude15_tool
    add(cut_extrude15_tool.part, mode=Mode.SUBTRACT)


with BuildPart() as body_2_4:
    add(body_2_3.part)

    # Cut-Extrude15: cut by cut_extrude15_tool
    add(cut_extrude15_tool.part, mode=Mode.SUBTRACT)


solid = Compound([body_4_1.part, body_3_1.part, part_5.part, body_2_4.part])
